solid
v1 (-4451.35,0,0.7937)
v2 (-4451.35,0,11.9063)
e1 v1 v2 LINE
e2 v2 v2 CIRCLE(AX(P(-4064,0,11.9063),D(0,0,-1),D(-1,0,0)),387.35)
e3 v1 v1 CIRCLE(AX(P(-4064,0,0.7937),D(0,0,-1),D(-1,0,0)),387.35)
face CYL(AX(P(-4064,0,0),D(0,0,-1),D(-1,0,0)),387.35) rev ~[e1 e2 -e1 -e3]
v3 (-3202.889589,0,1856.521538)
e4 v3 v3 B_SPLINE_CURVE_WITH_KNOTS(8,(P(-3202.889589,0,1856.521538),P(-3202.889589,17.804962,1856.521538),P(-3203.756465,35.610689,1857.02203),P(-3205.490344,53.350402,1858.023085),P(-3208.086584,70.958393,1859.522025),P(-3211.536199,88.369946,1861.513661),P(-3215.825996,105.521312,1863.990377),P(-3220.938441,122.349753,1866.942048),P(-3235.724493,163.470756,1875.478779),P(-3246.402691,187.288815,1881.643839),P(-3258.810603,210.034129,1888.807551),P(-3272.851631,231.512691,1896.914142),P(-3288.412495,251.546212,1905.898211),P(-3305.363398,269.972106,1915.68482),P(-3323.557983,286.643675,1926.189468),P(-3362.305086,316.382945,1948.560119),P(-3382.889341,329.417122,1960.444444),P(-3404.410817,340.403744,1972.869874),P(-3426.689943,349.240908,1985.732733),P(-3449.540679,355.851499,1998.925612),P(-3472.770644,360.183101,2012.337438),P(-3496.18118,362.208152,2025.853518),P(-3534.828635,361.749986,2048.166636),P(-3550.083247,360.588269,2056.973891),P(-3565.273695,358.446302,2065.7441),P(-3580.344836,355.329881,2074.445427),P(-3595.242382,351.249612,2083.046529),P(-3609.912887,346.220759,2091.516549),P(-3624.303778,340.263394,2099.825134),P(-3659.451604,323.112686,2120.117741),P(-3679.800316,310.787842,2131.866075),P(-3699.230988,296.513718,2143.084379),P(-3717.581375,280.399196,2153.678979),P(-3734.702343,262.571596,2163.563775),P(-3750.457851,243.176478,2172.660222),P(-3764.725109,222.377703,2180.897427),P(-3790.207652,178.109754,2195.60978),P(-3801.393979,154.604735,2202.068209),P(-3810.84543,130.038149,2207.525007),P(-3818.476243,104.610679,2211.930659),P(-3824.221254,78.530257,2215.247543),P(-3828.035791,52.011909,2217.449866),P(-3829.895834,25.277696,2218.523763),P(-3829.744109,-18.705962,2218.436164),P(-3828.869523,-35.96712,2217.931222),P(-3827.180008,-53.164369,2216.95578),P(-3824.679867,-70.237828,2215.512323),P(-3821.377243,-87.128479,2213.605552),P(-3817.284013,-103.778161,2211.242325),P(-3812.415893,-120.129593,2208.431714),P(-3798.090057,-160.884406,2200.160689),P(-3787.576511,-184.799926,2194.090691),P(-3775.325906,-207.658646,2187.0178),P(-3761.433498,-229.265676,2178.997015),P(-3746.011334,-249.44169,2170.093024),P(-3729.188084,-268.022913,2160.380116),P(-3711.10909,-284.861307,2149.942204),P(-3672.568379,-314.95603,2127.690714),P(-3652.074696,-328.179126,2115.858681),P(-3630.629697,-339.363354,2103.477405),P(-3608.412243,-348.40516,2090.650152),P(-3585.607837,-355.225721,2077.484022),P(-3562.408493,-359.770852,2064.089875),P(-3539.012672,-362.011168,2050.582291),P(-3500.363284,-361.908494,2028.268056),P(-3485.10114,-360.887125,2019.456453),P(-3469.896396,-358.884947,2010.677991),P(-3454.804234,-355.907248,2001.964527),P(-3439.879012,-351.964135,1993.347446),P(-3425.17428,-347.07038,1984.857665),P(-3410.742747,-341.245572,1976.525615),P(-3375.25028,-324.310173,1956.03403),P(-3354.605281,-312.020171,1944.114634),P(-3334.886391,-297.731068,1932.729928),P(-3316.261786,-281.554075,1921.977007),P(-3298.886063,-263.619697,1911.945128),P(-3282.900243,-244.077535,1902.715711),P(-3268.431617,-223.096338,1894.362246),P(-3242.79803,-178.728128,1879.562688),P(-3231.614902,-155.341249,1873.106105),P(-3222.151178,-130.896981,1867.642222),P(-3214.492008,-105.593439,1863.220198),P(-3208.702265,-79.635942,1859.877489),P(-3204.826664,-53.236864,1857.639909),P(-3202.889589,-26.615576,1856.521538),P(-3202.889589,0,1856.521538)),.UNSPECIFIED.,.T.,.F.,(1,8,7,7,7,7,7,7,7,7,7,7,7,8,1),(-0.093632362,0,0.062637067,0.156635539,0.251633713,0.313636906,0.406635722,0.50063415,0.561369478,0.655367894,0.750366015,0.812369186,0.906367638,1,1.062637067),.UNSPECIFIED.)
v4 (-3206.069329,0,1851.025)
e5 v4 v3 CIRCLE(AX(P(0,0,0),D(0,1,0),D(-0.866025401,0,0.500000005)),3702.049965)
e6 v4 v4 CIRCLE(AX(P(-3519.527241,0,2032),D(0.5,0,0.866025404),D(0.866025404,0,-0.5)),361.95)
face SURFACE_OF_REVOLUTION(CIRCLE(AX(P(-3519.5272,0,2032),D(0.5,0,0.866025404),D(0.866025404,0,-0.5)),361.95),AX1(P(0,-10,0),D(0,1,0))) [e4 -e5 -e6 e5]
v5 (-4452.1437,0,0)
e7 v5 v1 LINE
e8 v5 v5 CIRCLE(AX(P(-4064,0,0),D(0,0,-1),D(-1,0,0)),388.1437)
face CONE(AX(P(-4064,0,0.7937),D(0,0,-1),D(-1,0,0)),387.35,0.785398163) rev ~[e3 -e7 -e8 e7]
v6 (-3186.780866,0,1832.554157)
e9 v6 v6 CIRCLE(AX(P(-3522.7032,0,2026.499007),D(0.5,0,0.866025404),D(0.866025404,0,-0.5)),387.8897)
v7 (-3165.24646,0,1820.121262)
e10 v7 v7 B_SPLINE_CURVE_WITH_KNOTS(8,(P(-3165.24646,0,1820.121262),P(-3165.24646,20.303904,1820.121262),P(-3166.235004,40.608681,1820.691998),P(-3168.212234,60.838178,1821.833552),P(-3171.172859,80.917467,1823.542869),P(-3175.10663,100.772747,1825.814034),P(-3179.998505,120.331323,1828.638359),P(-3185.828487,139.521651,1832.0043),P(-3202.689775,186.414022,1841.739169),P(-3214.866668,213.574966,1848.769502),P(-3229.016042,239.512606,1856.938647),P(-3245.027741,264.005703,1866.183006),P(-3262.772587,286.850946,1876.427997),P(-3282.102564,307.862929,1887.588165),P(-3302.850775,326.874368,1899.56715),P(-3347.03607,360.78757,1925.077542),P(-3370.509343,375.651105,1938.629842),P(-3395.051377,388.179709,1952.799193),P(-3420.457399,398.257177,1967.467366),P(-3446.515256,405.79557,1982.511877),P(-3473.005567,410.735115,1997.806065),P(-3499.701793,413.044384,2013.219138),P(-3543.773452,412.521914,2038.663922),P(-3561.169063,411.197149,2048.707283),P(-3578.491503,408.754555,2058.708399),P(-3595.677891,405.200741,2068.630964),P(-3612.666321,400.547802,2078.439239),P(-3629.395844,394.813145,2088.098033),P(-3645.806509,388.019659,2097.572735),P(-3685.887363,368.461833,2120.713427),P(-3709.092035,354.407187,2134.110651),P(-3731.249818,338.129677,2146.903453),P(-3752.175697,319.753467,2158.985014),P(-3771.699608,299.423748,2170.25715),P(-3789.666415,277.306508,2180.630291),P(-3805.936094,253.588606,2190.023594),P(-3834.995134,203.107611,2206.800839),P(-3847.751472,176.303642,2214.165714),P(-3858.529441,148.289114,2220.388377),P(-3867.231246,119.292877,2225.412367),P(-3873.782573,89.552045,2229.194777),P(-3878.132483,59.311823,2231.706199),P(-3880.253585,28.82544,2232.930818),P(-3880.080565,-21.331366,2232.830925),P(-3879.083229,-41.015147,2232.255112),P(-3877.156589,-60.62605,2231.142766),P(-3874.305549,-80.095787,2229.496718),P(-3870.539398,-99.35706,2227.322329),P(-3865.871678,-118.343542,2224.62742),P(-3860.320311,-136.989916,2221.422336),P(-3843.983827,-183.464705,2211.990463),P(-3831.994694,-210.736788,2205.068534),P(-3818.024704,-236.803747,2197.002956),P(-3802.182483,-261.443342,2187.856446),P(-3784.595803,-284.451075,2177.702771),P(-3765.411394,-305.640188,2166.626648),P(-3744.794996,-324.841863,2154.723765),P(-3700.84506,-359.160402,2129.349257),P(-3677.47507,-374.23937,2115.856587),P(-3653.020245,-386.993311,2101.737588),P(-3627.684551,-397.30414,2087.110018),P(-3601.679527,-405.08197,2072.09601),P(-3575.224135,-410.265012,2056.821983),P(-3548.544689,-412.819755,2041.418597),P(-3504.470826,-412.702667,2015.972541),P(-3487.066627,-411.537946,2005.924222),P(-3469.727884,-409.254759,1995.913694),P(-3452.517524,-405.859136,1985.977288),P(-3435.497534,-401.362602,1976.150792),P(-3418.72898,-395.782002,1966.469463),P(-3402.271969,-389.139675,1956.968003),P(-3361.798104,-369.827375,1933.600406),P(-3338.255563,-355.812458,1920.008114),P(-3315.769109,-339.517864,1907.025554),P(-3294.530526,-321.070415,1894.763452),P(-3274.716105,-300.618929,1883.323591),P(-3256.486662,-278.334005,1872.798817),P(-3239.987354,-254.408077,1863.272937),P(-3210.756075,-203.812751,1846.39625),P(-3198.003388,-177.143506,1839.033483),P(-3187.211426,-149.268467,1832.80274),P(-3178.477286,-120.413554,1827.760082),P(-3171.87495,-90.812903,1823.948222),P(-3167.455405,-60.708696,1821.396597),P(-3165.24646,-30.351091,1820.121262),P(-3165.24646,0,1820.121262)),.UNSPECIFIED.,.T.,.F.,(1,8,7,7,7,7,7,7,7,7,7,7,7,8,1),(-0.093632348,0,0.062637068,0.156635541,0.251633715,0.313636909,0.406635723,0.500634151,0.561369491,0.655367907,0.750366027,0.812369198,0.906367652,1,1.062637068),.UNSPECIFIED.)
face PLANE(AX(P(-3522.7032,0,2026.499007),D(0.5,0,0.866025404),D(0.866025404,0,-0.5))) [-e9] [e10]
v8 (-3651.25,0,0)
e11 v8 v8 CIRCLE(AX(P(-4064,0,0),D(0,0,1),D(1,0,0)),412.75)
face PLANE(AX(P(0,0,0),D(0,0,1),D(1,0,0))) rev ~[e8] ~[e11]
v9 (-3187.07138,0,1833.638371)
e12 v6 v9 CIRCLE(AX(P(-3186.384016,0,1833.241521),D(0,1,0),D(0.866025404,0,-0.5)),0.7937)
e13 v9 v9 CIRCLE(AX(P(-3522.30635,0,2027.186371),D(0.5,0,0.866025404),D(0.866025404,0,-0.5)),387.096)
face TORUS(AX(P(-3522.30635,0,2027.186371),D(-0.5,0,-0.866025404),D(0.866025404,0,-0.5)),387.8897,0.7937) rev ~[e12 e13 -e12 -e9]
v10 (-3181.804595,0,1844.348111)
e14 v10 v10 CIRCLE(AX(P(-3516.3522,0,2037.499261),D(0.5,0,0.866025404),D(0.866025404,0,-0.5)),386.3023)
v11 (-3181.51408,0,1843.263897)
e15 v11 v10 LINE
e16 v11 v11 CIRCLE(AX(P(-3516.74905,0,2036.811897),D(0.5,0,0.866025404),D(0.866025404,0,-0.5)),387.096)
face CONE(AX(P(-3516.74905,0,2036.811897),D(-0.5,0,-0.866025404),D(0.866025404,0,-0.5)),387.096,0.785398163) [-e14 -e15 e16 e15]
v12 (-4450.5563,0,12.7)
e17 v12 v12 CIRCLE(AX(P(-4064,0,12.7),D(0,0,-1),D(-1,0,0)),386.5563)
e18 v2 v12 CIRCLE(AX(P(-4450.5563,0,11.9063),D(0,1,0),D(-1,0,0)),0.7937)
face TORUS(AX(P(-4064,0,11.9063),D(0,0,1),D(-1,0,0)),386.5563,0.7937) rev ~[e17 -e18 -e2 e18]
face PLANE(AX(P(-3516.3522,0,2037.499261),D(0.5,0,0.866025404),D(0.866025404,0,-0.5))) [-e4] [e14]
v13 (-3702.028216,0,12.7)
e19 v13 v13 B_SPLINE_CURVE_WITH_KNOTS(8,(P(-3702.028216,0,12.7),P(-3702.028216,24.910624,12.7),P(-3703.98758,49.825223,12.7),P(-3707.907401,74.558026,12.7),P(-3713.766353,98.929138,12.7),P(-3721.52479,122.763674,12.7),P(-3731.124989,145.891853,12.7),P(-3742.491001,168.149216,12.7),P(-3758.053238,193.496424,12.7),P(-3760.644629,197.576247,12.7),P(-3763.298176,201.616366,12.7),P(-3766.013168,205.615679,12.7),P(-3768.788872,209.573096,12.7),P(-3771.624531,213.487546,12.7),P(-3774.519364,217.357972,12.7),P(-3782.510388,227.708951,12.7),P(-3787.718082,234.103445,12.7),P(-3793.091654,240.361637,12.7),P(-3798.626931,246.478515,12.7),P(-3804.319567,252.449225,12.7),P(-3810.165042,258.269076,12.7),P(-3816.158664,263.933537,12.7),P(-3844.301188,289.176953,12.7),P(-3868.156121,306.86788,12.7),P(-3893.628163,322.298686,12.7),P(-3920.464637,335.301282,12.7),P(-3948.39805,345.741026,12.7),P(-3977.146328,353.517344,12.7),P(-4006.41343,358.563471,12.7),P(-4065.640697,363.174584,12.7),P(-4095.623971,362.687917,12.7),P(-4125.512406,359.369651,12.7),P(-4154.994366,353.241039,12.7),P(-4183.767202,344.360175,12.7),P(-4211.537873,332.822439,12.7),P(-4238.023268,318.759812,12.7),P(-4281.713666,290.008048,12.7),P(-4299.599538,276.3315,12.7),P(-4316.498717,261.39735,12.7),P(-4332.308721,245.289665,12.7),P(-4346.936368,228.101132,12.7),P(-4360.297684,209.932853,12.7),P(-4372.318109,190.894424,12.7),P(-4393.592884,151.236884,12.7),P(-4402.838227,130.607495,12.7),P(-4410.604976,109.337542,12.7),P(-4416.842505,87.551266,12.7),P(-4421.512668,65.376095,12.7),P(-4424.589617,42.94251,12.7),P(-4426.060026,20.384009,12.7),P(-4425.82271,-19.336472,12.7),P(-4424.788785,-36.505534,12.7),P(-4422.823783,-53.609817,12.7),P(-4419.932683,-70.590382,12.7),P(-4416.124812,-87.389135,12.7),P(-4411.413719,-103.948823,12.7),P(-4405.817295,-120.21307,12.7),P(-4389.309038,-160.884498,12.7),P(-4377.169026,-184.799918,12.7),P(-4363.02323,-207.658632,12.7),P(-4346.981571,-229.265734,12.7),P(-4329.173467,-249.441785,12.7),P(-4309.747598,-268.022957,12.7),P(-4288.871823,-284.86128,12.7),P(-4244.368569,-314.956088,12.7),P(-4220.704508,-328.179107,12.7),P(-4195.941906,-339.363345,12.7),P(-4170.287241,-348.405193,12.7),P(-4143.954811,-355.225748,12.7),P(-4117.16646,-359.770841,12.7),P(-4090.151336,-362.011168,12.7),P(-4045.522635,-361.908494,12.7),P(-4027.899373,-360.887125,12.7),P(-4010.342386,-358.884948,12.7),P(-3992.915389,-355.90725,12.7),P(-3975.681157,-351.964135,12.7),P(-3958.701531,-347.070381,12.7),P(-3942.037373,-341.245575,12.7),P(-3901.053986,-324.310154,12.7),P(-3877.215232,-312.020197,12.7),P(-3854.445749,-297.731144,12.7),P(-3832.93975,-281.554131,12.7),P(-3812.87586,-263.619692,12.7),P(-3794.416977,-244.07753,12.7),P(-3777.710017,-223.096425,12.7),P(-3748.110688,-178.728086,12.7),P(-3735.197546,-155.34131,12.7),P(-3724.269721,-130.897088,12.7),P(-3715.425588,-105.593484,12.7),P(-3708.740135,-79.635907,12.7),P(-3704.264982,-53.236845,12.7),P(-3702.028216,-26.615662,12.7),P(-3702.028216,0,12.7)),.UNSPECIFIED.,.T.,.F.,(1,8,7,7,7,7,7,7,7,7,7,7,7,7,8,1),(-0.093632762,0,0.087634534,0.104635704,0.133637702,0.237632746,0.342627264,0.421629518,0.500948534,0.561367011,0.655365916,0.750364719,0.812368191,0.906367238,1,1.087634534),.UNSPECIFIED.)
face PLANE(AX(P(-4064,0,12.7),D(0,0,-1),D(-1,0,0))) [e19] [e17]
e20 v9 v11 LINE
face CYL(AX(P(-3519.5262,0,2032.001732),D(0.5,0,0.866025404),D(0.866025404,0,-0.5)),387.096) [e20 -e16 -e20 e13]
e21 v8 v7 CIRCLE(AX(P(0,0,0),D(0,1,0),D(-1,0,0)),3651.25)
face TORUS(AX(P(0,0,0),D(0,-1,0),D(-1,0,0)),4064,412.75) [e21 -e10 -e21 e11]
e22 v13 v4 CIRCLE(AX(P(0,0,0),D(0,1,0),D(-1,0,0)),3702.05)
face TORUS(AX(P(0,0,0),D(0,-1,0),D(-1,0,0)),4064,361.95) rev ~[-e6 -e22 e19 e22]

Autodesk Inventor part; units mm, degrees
ref_plane "YZ Plane" through (0, 0, 0) normal (1, 0, 0) x (0, 1, 0)
ref_plane "XZ Plane" through (0, 0, 0) normal (0, 1, 0) x (-1, 0, 0)
ref_plane "XY Plane" through (0, 0, 0) normal (0, 0, 1) x (1, 0, 0)
sketch "Sketch1" plane through (0, 0, 0) normal (0, 0, 1) x (1, 0, 0)
  circle A0 centre (-4064, 0) radius 361.95
  circle A1 centre (-4064, 0) radius 412.75
  line L0 (0, -577.85) -> (0, 577.85) projected
  point P0 (0, 0)
  dimension "d0" = 723.9
  dimension "d1" = 825.5
  dimension "d2" = 4064
revolve "Revolution1" add sketch "Sketch1" angle 30 about axis through (0, -10, 0) along (0, 1, 0)
sketch "Sketch10" plane through (-4064, 0, 0) normal (0, 0, -1) x (-1, 0, 0)
  circle A0 centre (0, 0) radius 387.35
  circle A1 centre (0, 0) radius 412.75 construction
  point P0 (-4064, 0)
  dimension "d34" = 774.7
extrude "Extrusion9" cut sketch "Sketch10" against normal blind 12.7
sketch "Sketch11" plane through (-3519.5272, 0, 2032) normal (0.5, 0, 0.8660254) x (0.8660254, 0, -0.5)
  circle A0 centre (0, 0) radius 361.95 projected
  circle A1 centre (0, 0) radius 387.096
  circle A2 centre (0, 0) radius 425.45
  line L0 (4064, -595.63) -> (4064, 595.63) projected
  point P0 (4064, 0)
  dimension "d37" = 774.192
  dimension "d38" = 850.9
extrude "Extrusion10" cut sketch "Sketch11" against normal blind 6.35 contours A2
extrude "Extrusion11" add sketch "Sketch11" along normal blind 6.35 contours A0 | A1
revolve "Revolution2" cut sketch "Sketch11" angle 0.5 about axis through (0, -10, 0) along (0, 1, 0) contours A0
fillet "Fillet3" radius 0.7937 2 edges at (-3857.9382, 0, 2220.047) (-3676.65, 0, 12.7)
chamfer "Chamfer3" distance 0.7937 angle 45 2 edges at (-3851.5872, 0, 2231.0473) (-3676.65, 0, 0)
properties part number "A1-19027-100-04 HCWI elbow - male" material "Iron, HCWI"
